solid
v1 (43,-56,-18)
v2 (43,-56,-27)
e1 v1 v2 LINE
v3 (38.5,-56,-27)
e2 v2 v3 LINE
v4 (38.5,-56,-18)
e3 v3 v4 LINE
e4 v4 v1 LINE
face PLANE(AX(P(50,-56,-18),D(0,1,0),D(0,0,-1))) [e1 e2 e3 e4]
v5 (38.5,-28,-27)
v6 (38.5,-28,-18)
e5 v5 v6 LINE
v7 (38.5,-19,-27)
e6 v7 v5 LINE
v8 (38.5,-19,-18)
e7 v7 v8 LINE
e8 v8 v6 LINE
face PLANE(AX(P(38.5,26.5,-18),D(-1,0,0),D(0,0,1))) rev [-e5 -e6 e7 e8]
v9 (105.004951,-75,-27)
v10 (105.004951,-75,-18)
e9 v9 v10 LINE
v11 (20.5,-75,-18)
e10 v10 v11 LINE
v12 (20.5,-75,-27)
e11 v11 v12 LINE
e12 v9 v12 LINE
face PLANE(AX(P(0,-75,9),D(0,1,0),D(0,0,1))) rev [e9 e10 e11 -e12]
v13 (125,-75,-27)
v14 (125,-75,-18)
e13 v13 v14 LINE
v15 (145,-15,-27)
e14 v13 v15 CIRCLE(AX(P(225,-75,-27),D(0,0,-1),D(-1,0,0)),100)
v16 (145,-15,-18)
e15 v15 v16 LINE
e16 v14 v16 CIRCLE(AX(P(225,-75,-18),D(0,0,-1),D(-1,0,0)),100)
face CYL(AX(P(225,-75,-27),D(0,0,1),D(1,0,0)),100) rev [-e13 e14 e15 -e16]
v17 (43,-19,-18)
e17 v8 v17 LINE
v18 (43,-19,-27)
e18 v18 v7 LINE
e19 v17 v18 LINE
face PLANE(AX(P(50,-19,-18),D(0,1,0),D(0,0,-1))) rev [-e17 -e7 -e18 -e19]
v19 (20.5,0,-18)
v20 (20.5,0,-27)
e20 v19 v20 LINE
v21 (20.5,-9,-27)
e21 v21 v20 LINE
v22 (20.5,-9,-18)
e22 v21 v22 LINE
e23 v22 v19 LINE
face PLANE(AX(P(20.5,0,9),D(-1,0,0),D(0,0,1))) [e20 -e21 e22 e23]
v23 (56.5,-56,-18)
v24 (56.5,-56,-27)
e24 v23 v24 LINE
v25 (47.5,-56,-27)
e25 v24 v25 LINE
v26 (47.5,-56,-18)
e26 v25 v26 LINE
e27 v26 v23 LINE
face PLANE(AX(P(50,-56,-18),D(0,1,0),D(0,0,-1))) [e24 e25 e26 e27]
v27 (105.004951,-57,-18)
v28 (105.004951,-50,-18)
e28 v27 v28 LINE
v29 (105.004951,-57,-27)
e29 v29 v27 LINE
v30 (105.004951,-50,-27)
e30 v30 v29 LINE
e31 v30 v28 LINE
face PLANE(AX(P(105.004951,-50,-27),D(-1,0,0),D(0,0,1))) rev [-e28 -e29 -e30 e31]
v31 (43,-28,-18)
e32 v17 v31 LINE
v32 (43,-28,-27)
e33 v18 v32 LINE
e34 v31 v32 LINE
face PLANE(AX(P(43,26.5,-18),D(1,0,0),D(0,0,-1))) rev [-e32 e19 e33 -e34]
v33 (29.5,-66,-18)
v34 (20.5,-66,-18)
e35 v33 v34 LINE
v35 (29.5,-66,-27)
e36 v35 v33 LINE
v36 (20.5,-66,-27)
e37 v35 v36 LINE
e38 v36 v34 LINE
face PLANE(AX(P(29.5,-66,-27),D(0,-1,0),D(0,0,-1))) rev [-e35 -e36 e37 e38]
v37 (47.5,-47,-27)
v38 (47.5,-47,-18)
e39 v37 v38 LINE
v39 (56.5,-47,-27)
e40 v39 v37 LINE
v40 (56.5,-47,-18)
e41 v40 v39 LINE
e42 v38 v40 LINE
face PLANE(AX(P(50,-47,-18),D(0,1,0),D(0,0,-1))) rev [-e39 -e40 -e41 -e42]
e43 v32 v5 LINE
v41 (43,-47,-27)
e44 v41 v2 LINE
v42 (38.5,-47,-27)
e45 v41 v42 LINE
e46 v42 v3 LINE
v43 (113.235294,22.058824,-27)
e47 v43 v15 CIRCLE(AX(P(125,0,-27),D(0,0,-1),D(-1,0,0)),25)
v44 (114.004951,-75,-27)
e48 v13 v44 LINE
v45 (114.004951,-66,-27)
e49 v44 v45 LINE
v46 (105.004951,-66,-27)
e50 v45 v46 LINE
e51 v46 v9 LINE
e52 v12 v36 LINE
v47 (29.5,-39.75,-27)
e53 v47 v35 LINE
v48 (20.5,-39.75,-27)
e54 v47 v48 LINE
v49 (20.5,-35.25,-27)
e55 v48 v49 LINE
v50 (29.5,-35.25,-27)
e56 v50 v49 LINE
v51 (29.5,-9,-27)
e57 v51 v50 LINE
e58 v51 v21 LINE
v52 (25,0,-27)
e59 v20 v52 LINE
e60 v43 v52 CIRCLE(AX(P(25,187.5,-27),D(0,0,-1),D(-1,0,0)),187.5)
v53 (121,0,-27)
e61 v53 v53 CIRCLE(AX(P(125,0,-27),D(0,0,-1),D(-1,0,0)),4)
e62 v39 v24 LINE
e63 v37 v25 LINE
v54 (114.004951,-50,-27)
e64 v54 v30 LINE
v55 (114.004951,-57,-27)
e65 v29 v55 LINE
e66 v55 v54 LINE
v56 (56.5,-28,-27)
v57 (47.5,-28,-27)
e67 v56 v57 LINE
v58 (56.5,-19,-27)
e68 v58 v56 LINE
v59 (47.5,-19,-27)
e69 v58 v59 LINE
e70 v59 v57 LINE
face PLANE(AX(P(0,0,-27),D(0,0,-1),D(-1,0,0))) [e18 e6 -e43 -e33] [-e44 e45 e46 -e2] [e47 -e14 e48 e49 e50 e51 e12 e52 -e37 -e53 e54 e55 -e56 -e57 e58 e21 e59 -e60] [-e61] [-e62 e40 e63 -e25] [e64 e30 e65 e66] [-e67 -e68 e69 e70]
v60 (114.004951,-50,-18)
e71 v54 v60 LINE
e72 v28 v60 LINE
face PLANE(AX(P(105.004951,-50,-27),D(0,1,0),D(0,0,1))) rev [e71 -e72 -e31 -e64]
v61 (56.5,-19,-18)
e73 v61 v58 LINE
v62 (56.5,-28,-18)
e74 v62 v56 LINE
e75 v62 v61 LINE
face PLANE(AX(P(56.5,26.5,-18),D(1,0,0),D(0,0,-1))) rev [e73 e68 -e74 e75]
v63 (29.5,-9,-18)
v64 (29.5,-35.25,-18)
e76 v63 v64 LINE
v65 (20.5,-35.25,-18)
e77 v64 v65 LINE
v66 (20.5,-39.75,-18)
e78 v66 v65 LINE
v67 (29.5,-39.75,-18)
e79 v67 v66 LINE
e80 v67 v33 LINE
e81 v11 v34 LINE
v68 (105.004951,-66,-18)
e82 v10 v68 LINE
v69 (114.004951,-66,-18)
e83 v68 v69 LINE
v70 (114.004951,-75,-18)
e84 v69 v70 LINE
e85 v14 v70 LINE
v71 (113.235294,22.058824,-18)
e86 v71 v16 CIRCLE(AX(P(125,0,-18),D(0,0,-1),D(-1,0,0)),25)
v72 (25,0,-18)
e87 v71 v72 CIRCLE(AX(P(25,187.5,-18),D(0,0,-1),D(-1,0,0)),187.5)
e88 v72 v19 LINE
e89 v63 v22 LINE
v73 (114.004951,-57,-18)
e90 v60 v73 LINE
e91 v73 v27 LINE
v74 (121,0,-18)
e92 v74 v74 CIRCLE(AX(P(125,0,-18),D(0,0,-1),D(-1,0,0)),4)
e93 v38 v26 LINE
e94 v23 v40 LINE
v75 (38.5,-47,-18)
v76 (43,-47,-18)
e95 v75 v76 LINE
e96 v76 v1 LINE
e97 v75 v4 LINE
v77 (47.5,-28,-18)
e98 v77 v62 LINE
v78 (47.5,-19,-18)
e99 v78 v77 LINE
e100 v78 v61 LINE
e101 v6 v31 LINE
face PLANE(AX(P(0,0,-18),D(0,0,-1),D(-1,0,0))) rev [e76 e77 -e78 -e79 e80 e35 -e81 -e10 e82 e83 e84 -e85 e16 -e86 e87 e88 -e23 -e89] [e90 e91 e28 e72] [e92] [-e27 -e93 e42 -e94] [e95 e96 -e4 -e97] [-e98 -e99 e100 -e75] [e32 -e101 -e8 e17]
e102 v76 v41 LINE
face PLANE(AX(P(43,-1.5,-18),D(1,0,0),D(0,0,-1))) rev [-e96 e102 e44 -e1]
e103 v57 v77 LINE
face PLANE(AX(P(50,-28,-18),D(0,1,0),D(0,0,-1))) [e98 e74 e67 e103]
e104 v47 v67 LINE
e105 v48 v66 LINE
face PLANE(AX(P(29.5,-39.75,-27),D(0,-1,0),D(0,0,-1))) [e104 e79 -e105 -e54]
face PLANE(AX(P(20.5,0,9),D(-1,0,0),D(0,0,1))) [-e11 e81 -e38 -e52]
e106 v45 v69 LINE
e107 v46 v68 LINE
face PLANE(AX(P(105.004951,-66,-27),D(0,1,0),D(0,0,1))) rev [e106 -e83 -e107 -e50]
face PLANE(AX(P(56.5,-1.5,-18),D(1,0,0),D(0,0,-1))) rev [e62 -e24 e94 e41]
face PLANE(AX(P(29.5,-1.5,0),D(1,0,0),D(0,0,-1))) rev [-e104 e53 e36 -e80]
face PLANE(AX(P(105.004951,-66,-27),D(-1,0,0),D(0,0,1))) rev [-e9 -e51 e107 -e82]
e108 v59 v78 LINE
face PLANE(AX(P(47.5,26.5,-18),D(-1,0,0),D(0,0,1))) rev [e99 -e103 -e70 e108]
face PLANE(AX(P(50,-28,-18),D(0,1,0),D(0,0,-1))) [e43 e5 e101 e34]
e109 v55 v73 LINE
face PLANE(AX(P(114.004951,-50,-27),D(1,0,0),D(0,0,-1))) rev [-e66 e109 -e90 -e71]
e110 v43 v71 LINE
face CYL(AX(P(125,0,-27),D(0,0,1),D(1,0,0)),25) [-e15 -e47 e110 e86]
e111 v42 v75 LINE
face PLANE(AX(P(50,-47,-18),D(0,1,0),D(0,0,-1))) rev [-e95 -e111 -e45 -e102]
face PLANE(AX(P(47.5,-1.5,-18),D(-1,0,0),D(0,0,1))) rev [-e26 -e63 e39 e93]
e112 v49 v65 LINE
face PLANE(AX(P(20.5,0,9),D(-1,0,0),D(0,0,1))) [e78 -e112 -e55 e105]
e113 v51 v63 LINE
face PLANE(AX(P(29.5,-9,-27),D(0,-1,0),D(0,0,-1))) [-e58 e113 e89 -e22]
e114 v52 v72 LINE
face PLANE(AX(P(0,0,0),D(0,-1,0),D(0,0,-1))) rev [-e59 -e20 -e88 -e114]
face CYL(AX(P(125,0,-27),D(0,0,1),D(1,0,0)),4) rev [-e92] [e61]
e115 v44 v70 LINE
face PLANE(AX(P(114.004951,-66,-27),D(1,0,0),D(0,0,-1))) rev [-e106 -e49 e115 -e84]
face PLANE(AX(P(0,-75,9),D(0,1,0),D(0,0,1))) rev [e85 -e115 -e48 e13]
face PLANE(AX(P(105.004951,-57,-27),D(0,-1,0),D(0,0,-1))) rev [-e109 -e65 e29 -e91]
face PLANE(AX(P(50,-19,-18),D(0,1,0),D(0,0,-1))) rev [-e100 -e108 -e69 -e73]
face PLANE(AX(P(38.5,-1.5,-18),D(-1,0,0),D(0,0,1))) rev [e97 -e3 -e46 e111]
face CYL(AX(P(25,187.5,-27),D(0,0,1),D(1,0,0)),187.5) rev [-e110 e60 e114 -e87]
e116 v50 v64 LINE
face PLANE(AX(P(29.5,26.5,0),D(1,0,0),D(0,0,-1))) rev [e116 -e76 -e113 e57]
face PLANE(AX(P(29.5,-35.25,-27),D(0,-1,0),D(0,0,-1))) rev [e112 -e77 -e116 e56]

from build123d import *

# Parameters (mm, degrees)
SKETCH1_R                = 8
SKETCH1_R_2              = 4
BOSS_EXTRUDE1_DEPTH      = 9
BOSS_EXTRUDE1_2_DEPTH    = 9
SKETCH2_R                = 4
BOSS_EXTRUDE3_DEPTH      = 9
FILLET1_R                = 1
CUT_EXTRUDE1_DEPTH       = 214.789616212
SKETCH4_W                = 9
SKETCH4_H                = 27
BOSS_EXTRUDE4_DEPTH      = 75
BOSS_EXTRUDE5_START      = 9
SKETCH5_R                = 25
SKETCH5_R_2              = 4
BOSS_EXTRUDE5_DEPTH      = 9
BOSS_EXTRUDE6_DEPTH      = 4.5
BOSS_EXTRUDE6_DEPTH_BACK = 4.5
BOSS_EXTRUDE7_DEPTH      = 4.5
BOSS_EXTRUDE7_DEPTH_BACK = 4.5
BOSS_EXTRUDE7_START      = -25
SKETCH9_W                = 9
SKETCH9_H                = 7
SKETCH9_H_2              = 9
CUT_EXTRUDE2_DEPTH       = 217.612557346
CUT_EXTRUDE3_DEPTH       = 216.299790989
CUT_EXTRUDE3_DEPTH_BACK  = 216.299790989
CAVITY1_START            = -66
CAVITY1_OUTLINE_W        = 9
CAVITY1_OUTLINE_H        = 9
CAVITY1_DEPTH            = 26.25
CAVITY1_START_2          = -35.25
CAVITY1_2_OUTLINE_W      = 9
CAVITY1_2_OUTLINE_H      = 9
CAVITY1_2_DEPTH          = 26.25
CAVITY1_START_3          = -56
CAVITY1_3_OUTLINE_W      = 9
CAVITY1_3_OUTLINE_H      = 9
CAVITY1_3_OUTLINE_W_2    = 4.5
CAVITY1_3_DEPTH          = 9
CAVITY1_START_4          = -28
CAVITY1_4_OUTLINE_W      = 9
CAVITY1_4_OUTLINE_H      = 9
CAVITY1_4_OUTLINE_W_2    = 4.5
CAVITY1_4_DEPTH          = 9


# Read off the part's stored shape, not the designer's step: Cavity1
with BuildPart() as part:
    # Sketch1 → Boss-Extrude1 (new body)
    with BuildSketch(Plane.XY):
        with Locations((-125, 0)):
            Circle(SKETCH1_R)
        with Locations((-125, 0)):
            Circle(SKETCH1_R_2, mode=Mode.SUBTRACT)
    extrude(amount=BOSS_EXTRUDE1_DEPTH)



with BuildPart() as body_2:
    # Sketch1 → Boss-Extrude1 2 (new body)
    with BuildSketch(Plane.XY):
        with Locations((125, 0)):
            Circle(SKETCH1_R)
        with Locations((125, 0)):
            Circle(SKETCH1_R_2, mode=Mode.SUBTRACT)
    extrude(amount=BOSS_EXTRUDE1_2_DEPTH)


with BuildPart() as part_1:
    add(part.part)

    add(body_2.part)  # Boss-Extrude3 merges body 2
    # Sketch2 → Boss-Extrude3 (add)
    with BuildSketch(Plane.XY):
        with BuildLine():
            Line((-175, -75), (125, -75))
            ThreePointArc((125, -75), (130.131670325, -43.377223009), (145.000000492, -14.999999344))
            ThreePointArc((145.000000492, -14.999999344), (143.981414944, 16.269784471), (113.235294528, 22.058823748))
            ThreePointArc((113.235294528, 22.058823748), (25.000000075, 0), (-63.235294395, 22.058823677))
            ThreePointArc((-63.235294395, 22.058823677), (-75.420498385, 24.996463372), (-87.499999896, 21.650635154))
            ThreePointArc((-87.499999896, 21.650635154), (-99.999999954, 18.301270189), (-112.500000024, 21.650635108))
            ThreePointArc((-112.500000024, 21.650635108), (-124.99999995, 25), (-137.49999989, 21.650635158))
            ThreePointArc((-137.49999989, 21.650635158), (-149.999999954, 18.301270189), (-162.50000003, 21.650635112))
            ThreePointArc((-162.50000003, 21.650635112), (-193.705072901, 16.586749162), (-195.000000551, -14.999999265))
            ThreePointArc((-195.000000551, -14.999999265), (-180.13167034, -43.377222962), (-175, -75))
        make_face()
        with Locations((125, 0)):
            Circle(SKETCH2_R, mode=Mode.SUBTRACT)
        with Locations((-175, 0)):
            Circle(SKETCH2_R, mode=Mode.SUBTRACT)
        with Locations((-125, 0)):
            Circle(SKETCH2_R, mode=Mode.SUBTRACT)
        with Locations((-75, 0)):
            Circle(SKETCH2_R, mode=Mode.SUBTRACT)
    extrude(amount=BOSS_EXTRUDE3_DEPTH)

    # Fillet1
    fillet1_edges = [part_1.edges().sort_by_distance(p)[0] for p in [
        (-175, -75, 4.5),
        (125, -75, 4.5),
    ]]
    fillet(fillet1_edges, radius=FILLET1_R)

    # Sketch3 → Cut-Extrude1 (cut, through all)
    with BuildSketch(Plane.XY):
        Polygon((25, 0), (25, -75), (150, -75), (150, 25), (25, 25), align=None)
    extrude(amount=CUT_EXTRUDE1_DEPTH, mode=Mode.SUBTRACT)

    # Sketch4 → Boss-Extrude4 (add)
    with BuildSketch(Plane.XZ.offset(75)):
        with Locations((25, -4.5)):
            Rectangle(SKETCH4_W, SKETCH4_H)
    extrude(amount=-BOSS_EXTRUDE4_DEPTH)

    # Sketch5 → Boss-Extrude5 (add)
    # profile 1 of 4: a face of its own
    with BuildSketch(Plane(origin=(0, 0, -18), x_dir=(-1, 0, 0), z_dir=(0, 0, -1)).offset(BOSS_EXTRUDE5_START)):
        with BuildLine():
            ThreePointArc((-145.000000304, -14.999999594), (-130.131670275, -43.377223158), (-125, -75))
            Line((-125, -75), (-29.5, -75))
            Line((-29.5, -75), (-29.5, 0))
            Line((-29.5, 0), (-100, 0))
            ThreePointArc((-100, 0), (-117.09430609, -23.717082532), (-145.000000304, -14.999999594))
        make_face()
    # profile 2 of 4: a face of its own
    with BuildSketch(Plane(origin=(0, 0, -18), x_dir=(-1, 0, 0), z_dir=(0, 0, -1)).offset(BOSS_EXTRUDE5_START)):
        with Locations((-125, 0)):
            Circle(SKETCH5_R)
        with Locations((-125, 0)):
            Circle(SKETCH5_R_2, mode=Mode.SUBTRACT)
    # profile 3 of 4: a face of its own
    with BuildSketch(Plane(origin=(0, 0, -18), x_dir=(-1, 0, 0), z_dir=(0, 0, -1)).offset(BOSS_EXTRUDE5_START)):
        Polygon((-29.5, 0), (-29.5, -75), (-20.5, -75), (-20.5, 0), (-25, 0), align=None)
    # profile 4 of 4: a face of its own
    with BuildSketch(Plane(origin=(0, 0, -18), x_dir=(-1, 0, 0), z_dir=(0, 0, -1)).offset(BOSS_EXTRUDE5_START)):
        with BuildLine():
            Line((-100, 0), (-29.5, 0))
            Line((-29.5, 0), (-25, 0))
            ThreePointArc((-25, 0), (-70.475429529, 5.598281181), (-113.235293817, 22.058823369))
            ThreePointArc((-113.235293817, 22.058823369), (-103.56267677, 12.86239374), (-100, 0))
        make_face()
    extrude(amount=-BOSS_EXTRUDE5_DEPTH)

    # Sketch7 → Boss-Extrude6 (add, two sides: drawn at the far end of the back side and taken through both)
    with BuildSketch(Plane(origin=(0, -25, 0), x_dir=(1, 0, 0), z_dir=(0, 1, 0)).offset(-BOSS_EXTRUDE6_DEPTH_BACK)):
        with BuildLine():
            Line((56.5, 18), (29.5, 18))
            Line((29.5, 18), (29.5, -9))
            ThreePointArc((29.5, -9), (48.591883092, -1.091883092), (56.5, 18))
        make_face()
        with BuildLine():
            Line((-6.5, 0), (20.5, 0))
            Line((20.5, 0), (20.5, 27))
            ThreePointArc((20.5, 27), (1.408116908, 19.091883092), (-6.5, 0))
        make_face()
    extrude(amount=BOSS_EXTRUDE6_DEPTH + BOSS_EXTRUDE6_DEPTH_BACK)

    # Sketch7<3> → Boss-Extrude7 (add, two sides: drawn at the far end of the back side and taken through both)
    with BuildSketch(Plane(origin=(0, -25, 0), x_dir=(1, 0, 0), z_dir=(0, 1, 0)).offset(BOSS_EXTRUDE7_START - BOSS_EXTRUDE7_DEPTH_BACK)):
        with BuildLine():
            Line((56.5, 18), (29.5, 18))
            Line((29.5, 18), (29.5, -9))
            ThreePointArc((29.5, -9), (48.591883092, -1.091883092), (56.5, 18))
        make_face()
        with BuildLine():
            Line((-6.5, 0), (20.5, 0))
            Line((20.5, 0), (20.5, 27))
            ThreePointArc((20.5, 27), (1.408116908, 19.091883092), (-6.5, 0))
        make_face()
    extrude(amount=BOSS_EXTRUDE7_DEPTH + BOSS_EXTRUDE7_DEPTH_BACK)

    # Sketch9 → Cut-Extrude2 (cut, through all)
    with BuildSketch(Plane.XY.offset(9)):
        with Locations((-160.208548161, -53.5)):
            Rectangle(SKETCH9_W, SKETCH9_H)
        with Locations((-160.208548161, -70.5)):
            Rectangle(SKETCH9_W, SKETCH9_H_2)
        with Locations((-25.351798772, -53.5)):
            Rectangle(SKETCH9_W, SKETCH9_H)
        with Locations((-25.351798772, -70.5)):
            Rectangle(SKETCH9_W, SKETCH9_H_2)
        with Locations((109.504950616, -53.5)):
            Rectangle(SKETCH9_W, SKETCH9_H)
        with Locations((109.504950616, -70.5)):
            Rectangle(SKETCH9_W, SKETCH9_H_2)
    extrude(amount=-CUT_EXTRUDE2_DEPTH, mode=Mode.SUBTRACT)

    # Sketch10 → Cut-Extrude3 (cut, two sides: drawn at the far end of the back side and taken through both)
    with BuildSketch(Plane(origin=(0, 0, 0), x_dir=(1, 0, 0), z_dir=(0, 1, 0)).offset(-CUT_EXTRUDE3_DEPTH_BACK)):
        Polygon((-200, 27), (-200, 0), (25, 0), (25, -9), (150, -9), (150, 18), (20.5, 18), (20.5, 27), align=None)
    extrude(amount=CUT_EXTRUDE3_DEPTH + CUT_EXTRUDE3_DEPTH_BACK, mode=Mode.SUBTRACT)


with BuildPart() as cut_extrude3_kept_piece:
    # of the separate pieces the step leaves, the one the design keeps (cut_extrude3_pieces_kept)
    add(part_1.part.solids().sort_by_distance((20.5, 0, -27))[0])

    # Cavity1 outline → Cavity1 (cut)
    with BuildSketch(Plane(origin=(0, 0, 0), x_dir=(1, 0, 0), z_dir=(0, 1, 0)).offset(CAVITY1_START)):
        with Locations((25, 22.5)):
            Rectangle(CAVITY1_OUTLINE_W, CAVITY1_OUTLINE_H)
    extrude(amount=CAVITY1_DEPTH, mode=Mode.SUBTRACT)

    # Cavity1 2 outline → Cavity1 2 (cut)
    with BuildSketch(Plane(origin=(0, 0, 0), x_dir=(1, 0, 0), z_dir=(0, 1, 0)).offset(CAVITY1_START_2)):
        with Locations((25, 22.5)):
            Rectangle(CAVITY1_2_OUTLINE_W, CAVITY1_2_OUTLINE_H)
    extrude(amount=CAVITY1_2_DEPTH, mode=Mode.SUBTRACT)

    # Cavity1 3 outline → Cavity1 3 (cut)
    with BuildSketch(Plane(origin=(0, 0, 0), x_dir=(1, 0, 0), z_dir=(0, 1, 0)).offset(CAVITY1_START_3)):
        with Locations((52, 22.5)):
            Rectangle(CAVITY1_3_OUTLINE_W, CAVITY1_3_OUTLINE_H)
        with Locations((40.75, 22.5)):
            Rectangle(CAVITY1_3_OUTLINE_W_2, CAVITY1_3_OUTLINE_H)
    extrude(amount=CAVITY1_3_DEPTH, mode=Mode.SUBTRACT)

    # Cavity1 4 outline → Cavity1 4 (cut)
    with BuildSketch(Plane(origin=(0, 0, 0), x_dir=(1, 0, 0), z_dir=(0, 1, 0)).offset(CAVITY1_START_4)):
        with Locations((52, 22.5)):
            Rectangle(CAVITY1_4_OUTLINE_W, CAVITY1_4_OUTLINE_H)
        with Locations((40.75, 22.5)):
            Rectangle(CAVITY1_4_OUTLINE_W_2, CAVITY1_4_OUTLINE_H)
    extrude(amount=CAVITY1_4_DEPTH, mode=Mode.SUBTRACT)


solid = cut_extrude3_kept_piece.part
